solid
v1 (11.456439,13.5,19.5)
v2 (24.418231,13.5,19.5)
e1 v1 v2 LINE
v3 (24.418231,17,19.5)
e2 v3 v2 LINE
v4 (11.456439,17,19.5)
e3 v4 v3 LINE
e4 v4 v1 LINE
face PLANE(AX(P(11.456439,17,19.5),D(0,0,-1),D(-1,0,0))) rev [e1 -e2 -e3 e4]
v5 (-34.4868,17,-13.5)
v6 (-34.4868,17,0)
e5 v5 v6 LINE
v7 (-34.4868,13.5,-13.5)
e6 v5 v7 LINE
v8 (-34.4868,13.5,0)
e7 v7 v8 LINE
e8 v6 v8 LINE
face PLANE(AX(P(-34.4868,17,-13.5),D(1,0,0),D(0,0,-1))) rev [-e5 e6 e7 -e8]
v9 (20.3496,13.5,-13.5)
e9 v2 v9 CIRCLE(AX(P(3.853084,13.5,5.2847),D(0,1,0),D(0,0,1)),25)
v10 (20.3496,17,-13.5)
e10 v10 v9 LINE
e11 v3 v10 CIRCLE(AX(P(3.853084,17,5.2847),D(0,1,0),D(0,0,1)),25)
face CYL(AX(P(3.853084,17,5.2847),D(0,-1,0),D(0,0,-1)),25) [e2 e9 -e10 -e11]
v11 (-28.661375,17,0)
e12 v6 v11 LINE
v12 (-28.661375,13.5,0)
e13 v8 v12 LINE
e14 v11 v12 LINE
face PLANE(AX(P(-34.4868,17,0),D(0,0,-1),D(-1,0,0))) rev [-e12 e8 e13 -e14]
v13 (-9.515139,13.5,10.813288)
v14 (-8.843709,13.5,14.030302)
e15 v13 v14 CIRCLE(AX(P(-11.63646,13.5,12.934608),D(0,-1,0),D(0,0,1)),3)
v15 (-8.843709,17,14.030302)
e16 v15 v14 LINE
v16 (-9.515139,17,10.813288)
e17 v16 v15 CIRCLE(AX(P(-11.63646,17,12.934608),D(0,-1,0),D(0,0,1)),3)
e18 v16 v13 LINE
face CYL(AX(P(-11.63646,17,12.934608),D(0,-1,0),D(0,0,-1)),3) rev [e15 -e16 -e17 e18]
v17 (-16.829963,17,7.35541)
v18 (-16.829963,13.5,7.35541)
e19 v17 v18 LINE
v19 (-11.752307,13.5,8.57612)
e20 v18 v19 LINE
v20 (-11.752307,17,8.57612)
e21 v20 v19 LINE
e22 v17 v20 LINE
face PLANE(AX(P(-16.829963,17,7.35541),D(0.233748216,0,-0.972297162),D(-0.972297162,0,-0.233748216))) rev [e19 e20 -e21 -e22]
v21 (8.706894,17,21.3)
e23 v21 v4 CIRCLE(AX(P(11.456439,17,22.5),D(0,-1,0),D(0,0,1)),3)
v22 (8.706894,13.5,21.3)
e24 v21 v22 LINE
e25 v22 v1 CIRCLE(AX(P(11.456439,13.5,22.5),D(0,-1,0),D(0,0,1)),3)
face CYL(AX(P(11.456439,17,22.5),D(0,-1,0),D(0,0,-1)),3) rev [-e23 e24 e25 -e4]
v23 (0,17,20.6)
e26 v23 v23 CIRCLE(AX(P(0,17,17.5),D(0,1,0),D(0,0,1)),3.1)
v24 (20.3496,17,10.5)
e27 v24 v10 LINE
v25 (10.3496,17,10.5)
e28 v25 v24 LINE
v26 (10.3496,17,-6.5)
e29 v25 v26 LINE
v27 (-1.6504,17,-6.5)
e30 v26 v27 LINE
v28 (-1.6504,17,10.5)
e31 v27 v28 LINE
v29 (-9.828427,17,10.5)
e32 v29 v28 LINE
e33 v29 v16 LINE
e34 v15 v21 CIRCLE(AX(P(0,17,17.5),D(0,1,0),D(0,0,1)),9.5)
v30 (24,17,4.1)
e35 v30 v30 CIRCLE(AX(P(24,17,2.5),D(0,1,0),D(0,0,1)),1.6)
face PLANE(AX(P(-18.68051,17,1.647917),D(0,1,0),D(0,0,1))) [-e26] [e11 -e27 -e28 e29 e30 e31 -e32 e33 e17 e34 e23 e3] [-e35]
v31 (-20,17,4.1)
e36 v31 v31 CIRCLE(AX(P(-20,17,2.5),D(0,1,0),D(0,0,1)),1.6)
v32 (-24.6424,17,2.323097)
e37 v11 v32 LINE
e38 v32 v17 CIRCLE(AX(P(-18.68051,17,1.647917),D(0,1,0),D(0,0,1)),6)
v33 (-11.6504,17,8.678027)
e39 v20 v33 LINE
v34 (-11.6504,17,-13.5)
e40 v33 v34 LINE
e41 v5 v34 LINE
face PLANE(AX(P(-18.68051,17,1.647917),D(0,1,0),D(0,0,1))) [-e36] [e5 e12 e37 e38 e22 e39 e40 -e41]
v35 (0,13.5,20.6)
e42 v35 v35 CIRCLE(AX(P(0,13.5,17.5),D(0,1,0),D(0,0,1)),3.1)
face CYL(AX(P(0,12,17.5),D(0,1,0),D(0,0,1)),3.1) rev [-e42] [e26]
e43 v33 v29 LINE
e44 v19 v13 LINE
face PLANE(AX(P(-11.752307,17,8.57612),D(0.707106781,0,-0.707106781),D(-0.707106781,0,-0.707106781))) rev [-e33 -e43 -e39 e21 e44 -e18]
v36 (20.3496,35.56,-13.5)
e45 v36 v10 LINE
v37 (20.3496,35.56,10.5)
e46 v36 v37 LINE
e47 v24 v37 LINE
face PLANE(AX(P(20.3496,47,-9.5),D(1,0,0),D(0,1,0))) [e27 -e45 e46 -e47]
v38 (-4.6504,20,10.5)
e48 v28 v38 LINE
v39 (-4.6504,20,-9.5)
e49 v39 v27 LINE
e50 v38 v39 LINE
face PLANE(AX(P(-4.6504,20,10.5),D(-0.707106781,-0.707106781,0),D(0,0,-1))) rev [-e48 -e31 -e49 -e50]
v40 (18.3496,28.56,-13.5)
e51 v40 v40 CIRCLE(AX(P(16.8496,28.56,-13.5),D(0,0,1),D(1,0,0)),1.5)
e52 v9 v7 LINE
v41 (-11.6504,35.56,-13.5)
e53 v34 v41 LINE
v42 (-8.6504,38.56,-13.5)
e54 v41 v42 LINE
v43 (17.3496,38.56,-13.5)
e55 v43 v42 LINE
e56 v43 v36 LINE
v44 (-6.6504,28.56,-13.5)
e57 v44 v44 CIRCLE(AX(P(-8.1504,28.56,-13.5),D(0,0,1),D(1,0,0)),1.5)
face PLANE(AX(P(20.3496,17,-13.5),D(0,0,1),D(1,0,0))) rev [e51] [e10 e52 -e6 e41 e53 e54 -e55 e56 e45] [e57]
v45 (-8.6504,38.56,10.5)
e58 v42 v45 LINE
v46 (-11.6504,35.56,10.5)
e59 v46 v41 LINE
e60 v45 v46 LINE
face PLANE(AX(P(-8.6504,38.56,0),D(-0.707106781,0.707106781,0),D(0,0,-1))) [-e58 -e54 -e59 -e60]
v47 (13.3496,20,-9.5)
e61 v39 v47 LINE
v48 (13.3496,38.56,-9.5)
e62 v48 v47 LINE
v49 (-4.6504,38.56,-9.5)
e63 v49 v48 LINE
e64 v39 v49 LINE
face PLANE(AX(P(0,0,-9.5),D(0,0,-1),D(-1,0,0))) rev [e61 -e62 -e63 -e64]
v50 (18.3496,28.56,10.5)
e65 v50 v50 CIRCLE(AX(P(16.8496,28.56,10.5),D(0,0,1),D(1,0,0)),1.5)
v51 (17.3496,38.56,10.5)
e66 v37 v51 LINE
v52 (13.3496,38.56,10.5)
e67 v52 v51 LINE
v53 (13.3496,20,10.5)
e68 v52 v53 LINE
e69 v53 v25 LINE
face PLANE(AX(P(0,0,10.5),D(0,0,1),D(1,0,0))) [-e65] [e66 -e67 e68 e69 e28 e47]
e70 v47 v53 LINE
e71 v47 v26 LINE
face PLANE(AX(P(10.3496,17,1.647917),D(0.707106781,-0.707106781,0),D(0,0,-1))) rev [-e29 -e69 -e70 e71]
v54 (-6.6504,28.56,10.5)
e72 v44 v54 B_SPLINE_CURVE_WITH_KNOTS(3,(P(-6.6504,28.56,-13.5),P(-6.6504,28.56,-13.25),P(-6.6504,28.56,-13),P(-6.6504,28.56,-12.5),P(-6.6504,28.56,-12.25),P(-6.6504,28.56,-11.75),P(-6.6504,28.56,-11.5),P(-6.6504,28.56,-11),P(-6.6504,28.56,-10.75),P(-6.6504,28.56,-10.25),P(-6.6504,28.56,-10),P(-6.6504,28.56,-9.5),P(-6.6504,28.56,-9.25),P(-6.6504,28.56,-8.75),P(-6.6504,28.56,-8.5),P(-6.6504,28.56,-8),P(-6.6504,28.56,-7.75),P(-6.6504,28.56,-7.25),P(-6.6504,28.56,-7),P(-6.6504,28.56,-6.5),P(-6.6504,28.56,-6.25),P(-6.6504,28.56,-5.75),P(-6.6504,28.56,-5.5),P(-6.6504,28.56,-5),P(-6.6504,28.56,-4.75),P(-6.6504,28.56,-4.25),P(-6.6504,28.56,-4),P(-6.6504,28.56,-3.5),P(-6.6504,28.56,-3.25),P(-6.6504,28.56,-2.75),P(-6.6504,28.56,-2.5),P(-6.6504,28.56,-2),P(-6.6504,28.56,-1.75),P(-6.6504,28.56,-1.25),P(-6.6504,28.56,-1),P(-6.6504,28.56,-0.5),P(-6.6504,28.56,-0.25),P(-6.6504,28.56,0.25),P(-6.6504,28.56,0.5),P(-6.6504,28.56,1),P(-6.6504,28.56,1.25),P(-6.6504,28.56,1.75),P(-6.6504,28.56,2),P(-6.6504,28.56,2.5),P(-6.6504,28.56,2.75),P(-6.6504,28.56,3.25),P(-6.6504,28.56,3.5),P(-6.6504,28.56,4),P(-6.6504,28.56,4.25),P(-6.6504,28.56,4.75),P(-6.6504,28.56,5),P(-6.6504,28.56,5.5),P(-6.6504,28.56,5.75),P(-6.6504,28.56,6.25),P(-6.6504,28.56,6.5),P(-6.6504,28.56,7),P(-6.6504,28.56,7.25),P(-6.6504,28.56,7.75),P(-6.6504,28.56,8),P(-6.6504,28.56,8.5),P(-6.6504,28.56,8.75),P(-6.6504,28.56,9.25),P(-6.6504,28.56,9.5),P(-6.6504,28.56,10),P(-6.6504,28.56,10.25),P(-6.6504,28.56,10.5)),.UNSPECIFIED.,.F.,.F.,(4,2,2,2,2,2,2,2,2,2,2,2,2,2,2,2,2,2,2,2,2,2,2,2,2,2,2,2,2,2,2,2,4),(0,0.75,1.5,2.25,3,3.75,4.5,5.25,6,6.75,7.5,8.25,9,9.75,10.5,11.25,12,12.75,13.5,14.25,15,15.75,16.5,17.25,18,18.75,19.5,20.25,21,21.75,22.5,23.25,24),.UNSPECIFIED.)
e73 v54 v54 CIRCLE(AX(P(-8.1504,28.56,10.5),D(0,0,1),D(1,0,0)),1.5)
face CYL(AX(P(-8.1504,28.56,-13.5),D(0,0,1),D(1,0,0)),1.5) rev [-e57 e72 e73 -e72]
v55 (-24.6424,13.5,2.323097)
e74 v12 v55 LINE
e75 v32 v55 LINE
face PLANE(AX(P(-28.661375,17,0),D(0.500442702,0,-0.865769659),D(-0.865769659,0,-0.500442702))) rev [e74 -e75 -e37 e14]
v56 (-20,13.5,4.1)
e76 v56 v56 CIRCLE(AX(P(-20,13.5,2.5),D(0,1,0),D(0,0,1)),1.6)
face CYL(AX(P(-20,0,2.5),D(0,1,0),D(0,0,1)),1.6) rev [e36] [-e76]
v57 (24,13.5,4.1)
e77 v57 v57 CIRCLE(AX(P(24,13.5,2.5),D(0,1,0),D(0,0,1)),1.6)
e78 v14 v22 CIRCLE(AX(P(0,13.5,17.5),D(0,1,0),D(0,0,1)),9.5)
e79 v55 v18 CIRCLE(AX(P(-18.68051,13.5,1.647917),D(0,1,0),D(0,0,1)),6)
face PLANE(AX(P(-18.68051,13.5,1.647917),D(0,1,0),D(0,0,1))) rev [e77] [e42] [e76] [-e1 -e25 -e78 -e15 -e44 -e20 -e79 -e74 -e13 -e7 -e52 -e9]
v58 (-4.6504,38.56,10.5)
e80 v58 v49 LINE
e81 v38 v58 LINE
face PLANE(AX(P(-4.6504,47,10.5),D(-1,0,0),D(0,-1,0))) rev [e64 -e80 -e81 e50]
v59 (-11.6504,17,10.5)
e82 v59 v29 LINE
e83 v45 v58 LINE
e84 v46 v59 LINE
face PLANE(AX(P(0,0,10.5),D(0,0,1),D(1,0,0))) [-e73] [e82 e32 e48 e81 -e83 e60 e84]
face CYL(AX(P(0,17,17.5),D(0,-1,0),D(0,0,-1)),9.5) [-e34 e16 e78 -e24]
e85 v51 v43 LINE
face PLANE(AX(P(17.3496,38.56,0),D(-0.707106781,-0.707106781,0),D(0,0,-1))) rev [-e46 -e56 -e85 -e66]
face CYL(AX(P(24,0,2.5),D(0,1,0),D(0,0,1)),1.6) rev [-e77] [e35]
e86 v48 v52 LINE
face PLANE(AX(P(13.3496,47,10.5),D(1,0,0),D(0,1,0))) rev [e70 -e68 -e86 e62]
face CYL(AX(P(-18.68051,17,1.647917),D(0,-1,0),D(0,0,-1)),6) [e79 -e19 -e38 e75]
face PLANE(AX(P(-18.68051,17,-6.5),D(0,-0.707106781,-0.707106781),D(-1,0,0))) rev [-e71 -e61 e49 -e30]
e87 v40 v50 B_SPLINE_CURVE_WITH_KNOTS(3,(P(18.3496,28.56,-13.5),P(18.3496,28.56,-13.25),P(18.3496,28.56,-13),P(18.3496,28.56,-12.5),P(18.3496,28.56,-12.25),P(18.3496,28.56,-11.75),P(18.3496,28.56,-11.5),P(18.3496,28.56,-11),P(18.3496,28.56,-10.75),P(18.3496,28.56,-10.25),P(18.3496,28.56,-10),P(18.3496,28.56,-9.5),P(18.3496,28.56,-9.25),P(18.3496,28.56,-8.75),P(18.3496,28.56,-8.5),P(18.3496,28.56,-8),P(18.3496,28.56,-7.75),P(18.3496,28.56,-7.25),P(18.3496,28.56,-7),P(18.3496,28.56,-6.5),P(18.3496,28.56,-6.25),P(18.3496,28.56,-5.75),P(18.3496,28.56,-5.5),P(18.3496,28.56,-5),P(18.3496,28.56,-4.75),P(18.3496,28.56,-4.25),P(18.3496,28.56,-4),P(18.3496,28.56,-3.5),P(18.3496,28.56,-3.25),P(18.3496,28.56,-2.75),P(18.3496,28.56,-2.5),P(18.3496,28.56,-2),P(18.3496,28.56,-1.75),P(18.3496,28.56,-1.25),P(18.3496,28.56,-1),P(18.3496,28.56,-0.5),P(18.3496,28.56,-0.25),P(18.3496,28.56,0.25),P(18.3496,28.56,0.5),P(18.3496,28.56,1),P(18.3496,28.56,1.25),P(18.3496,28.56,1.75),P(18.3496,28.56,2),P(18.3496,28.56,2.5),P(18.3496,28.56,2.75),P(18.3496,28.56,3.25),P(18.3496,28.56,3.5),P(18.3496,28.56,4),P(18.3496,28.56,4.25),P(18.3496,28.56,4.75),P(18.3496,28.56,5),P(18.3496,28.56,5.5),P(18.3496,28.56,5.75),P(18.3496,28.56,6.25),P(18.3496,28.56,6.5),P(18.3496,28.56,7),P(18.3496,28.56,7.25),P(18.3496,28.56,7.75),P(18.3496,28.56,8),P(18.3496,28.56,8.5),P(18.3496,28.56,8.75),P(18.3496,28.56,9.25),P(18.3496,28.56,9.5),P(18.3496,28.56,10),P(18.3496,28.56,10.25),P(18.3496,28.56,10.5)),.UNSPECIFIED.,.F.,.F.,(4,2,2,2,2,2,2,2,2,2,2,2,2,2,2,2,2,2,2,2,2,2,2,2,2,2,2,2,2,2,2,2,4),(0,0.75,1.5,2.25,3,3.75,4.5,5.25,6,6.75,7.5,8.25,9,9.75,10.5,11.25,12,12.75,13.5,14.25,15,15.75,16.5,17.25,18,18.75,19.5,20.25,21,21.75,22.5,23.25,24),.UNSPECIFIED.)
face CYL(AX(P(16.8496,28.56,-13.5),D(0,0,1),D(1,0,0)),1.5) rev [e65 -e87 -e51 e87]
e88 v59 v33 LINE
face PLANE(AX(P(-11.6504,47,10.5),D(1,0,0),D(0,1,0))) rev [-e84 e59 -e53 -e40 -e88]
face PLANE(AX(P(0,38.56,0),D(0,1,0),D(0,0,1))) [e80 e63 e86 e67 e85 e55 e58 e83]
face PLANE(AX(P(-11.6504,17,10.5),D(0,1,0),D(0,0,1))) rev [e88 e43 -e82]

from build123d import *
from build123d.topology import SkipClean

# Parameters (mm, degrees)
CROQUIS1_W              = 70
CROQUIS1_H              = 65
EXTRUIR1_DEPTH          = 3.5
CROQUIS2_R              = 3.1
EXTRUIR2_DEPTH          = 5
EXTRUIR3_DEPTH          = 10
CROQUIS4_OUTSIDE_W      = 91.294
CROQUIS4_OUTSIDE_H      = 86.294
EXTRUIR4_DEPTH          = 10
REDONDEO1_R             = 3
EXTRUIR5_DEPTH          = 13.5
EXTRUIR6_DEPTH          = 3.5
CROQUIS7_R              = 1.6
EXTRUIR7_DEPTH          = 47.982330447
CROQUIS8_R              = 3.1
EXTRUIR8_DEPTH          = 5
CROQUIS9_W              = 0.7
CROQUIS9_H              = 10.5
EXTRUIR9_DEPTH          = 10
EXTRUIR10_DEPTH         = 63.752948337
EXTRUIR10_DEPTH_BACK    = 10
CROQUIS10_W             = 3.0625
CROQUIS10_H             = 5
CROQUIS11_W             = 54.8364
CROQUIS11_H             = 30
SALIENTE_EXTRUIR1_DEPTH = 4
CROQUIS13_W             = 7
CROQUIS13_H             = 30
SALIENTE_EXTRUIR2_DEPTH = 20
CORTAR_EXTRUIR1_DEPTH   = 8.44
CROQUIS15_W             = 22.8364
CROQUIS15_H             = 21.56
CORTAR_EXTRUIR2_DEPTH   = 8.44
CHAFL_N2_SIZE           = 3
CROQUIS16_R             = 1.5
CORTAR_EXTRUIR3_DEPTH   = 58.02817702
CHAFL_N3_SIZE           = 3


with BuildPart() as part:
    # Croquis1 → Extruir1 (new body)
    with BuildSketch(Plane(origin=(0, 0, 0), x_dir=(1, 0, 0), z_dir=(0, 1, 0))):
        Rectangle(CROQUIS1_W, CROQUIS1_H)
    extrude(amount=EXTRUIR1_DEPTH)

    # Croquis2 → Extruir2 (cut)
    with BuildSketch(Plane(origin=(0, 3.5, 0), x_dir=(1, 0, 0), z_dir=(0, 1, 0))):
        with Locations(Location((0, -17.5, 0), (0, 0, 270))):
            Circle(CROQUIS2_R)
    extrude(amount=-EXTRUIR2_DEPTH, mode=Mode.SUBTRACT)

    # Croquis3 → Extruir3 (add)
    with BuildSketch(Plane(origin=(0, 3.5, 0), x_dir=(1, 0, 0), z_dir=(0, 1, 0))):
        with BuildLine():
            Line((-34.4868, 13.5), (20.3496, 13.5))
            Line((20.3496, 13.5), (20.3496, 0))
            Line((20.3496, 0), (17.146428199, 0))
            ThreePointArc((17.146428199, 0), (22.955777517, -8.939493087), (24.418230894, -19.5))
            Line((24.418230894, -19.5), (9.287087811, -19.5))
            ThreePointArc((9.287087811, -19.5), (-3.635492607, -26.276855559), (-7.981176331, -12.347250794))
            Line((-7.981176331, -12.347250794), (-18.680510212, -1.647916913))
            ThreePointArc((-18.680510212, -1.647916913), (-17.932408832, -0.806327142), (-17.146428199, 0))
            Line((-17.146428199, 0), (-34.4868, 0))
            Line((-34.4868, 0), (-34.4868, 13.5))
        make_face()
        with BuildLine():
            Line((-32.9868, 1.5), (-12.961481397, 1.5))
            ThreePointArc((-12.961481397, 1.5), (-14.868021343, 0.048274597), (-16.613165932, -1.593940849))
            Line((-16.613165932, -1.593940849), (-5.999348286, -12.207758495))
            ThreePointArc((-5.999348286, -12.207758495), (-3.061467459, -24.89103626), (7.984359711, -18))
            Line((7.984359711, -18), (22.994564575, -18))
            ThreePointArc((22.994564575, -18), (20.451694563, -6.977253708), (12.961481397, 1.5))
            Line((12.961481397, 1.5), (18.8496, 1.5))
            Line((18.8496, 1.5), (18.8496, 12))
            Line((18.8496, 12), (-32.9868, 12))
            Line((-32.9868, 12), (-32.9868, 1.5))
        make_face(mode=Mode.SUBTRACT)
    extrude(amount=EXTRUIR3_DEPTH)

    # Croquis4 outside → Extruir4 (cut)
    with SkipClean():  # the faces are left unmerged after this step: merging them gives an invalid solid
        with BuildSketch(Plane(origin=(0, 3.5, 0), x_dir=(1, 0, 0), z_dir=(0, 1, 0))):
            Rectangle(CROQUIS4_OUTSIDE_W, CROQUIS4_OUTSIDE_H)
            with BuildLine():
                Line((-34.4868, 0), (-17.146428199, 0))
                ThreePointArc((-17.146428199, 0), (-17.932408832, -0.806327142), (-18.680510212, -1.647916913))
                Line((-18.680510212, -1.647916913), (-7.981176331, -12.347250794))
                ThreePointArc((-7.981176331, -12.347250794), (-3.635492607, -26.276855559), (9.287087811, -19.5))
                Line((9.287087811, -19.5), (24.418230894, -19.5))
                ThreePointArc((24.418230894, -19.5), (22.955777517, -8.939493087), (17.146428199, 0))
                Line((17.146428199, 0), (20.3496, 0))
                Line((20.3496, 0), (20.3496, 13.5))
                Line((20.3496, 13.5), (-34.4868, 13.5))
                Line((-34.4868, 13.5), (-34.4868, 0))
            make_face(mode=Mode.SUBTRACT)
        extrude(amount=-EXTRUIR4_DEPTH, mode=Mode.SUBTRACT)

    # Redondeo1
    redondeo1_edges = [part.edges().sort_by_distance(p)[0] for p in [
        (-7.981176331, 8.5, 12.347250794),
        (9.287087811, 8.5, 19.5),
        (-5.999348286, 8.5, 12.207758495),
        (7.984359711, 8.5, 18),
    ]]
    fillet(redondeo1_edges, radius=REDONDEO1_R)

    # Croquis5 → Extruir5 (add)
    with SkipClean():  # the faces are left unmerged after this step: merging them gives an invalid solid
        with BuildSketch(Plane.XZ):
            with BuildLine():
                Line((-18.680510212, 1.647916913), (-14.437869525, 5.8905576))
                ThreePointArc((-14.437869525, 5.8905576), (-21.723092903, 6.819250451), (-24.449770984, 0))
                Line((-24.449770984, 0), (-17.146428199, 0))
                ThreePointArc((-17.146428199, 0), (-17.932408832, 0.806327142), (-18.680510212, 1.647916913))
            make_face()
            with BuildLine():
                Line((20.3496, 0), (20.3496, -13.5))
                ThreePointArc((20.3496, -13.5), (28.665212431, 2.225567304), (24.418230894, 19.5))
                ThreePointArc((24.418230894, 19.5), (22.955777517, 8.939493087), (17.146428199, 0))
                Line((17.146428199, 0), (20.3496, 0))
            make_face()
        extrude(amount=-EXTRUIR5_DEPTH)

    # Chaflán1
    # the kernel refuses this chamfer: 5, 4.044665138 mm, written as the material it adds along each edge
    with BuildSketch(Plane(origin=(-14.437869525, 3.5, 5.8905576), x_dir=(-0.8768595348589335, 0, 0.48074666522709736), z_dir=(0, 1, 0))) as chafl_n1_piece_1:
        with BuildLine():
            Line((2.949791971, 0), (-1.211824758, 3.780414953))
            Line((-1.211824758, 3.780414953), (-1.307822013, 3.752405544))
            ThreePointArc((-1.307822013, 3.752405544), (-0.651776703, 1.876825504), (-0.095997255, -0.02800941))
            Line((-0.095997255, -0.02800941), (0.02800941, -0.095997255))
            ThreePointArc((0.02800941, -0.095997255), (1.47002525, 0.136406993), (2.931105495, -0.098238565))
            Line((2.931105495, -0.098238565), (2.949791971, 0))
        make_face()
    extrude(amount=10)
    with BuildSketch(Plane(origin=(-24.449770984, 3.5, 0), x_dir=(-0.00803680374358312, 0, 0.9999677043712897), z_dir=(0, 1, 0))) as chafl_n1_piece_2:
        with BuildLine():
            Line((2.423263449, 0), (-0.064845869, -4.38542071))
            Line((-0.064845869, -4.38542071), (-0.164842639, -4.386224391))
            ThreePointArc((-0.164842639, -4.386224391), (-0.082377051, -2.193111839), (-0.09999677, -0.00080368))
            Line((-0.09999677, -0.00080368), (0.026691621, 0.096371974))
            ThreePointArc((0.026691621, 0.096371974), (1.204598314, -0.104316531), (2.411212242, 0.099271186))
            Line((2.411212242, 0.099271186), (2.423263449, 0))
        make_face()
    extrude(amount=10)
    with BuildSketch(Plane(origin=(-24.449770984, 0, 0), x_dir=(-0.9997395779240649, 0, -0.022820524363231547), z_dir=(0, 1, 0))) as chafl_n1_piece_3:
        with BuildLine():
            Line((4.385900112, 0), (-0.035828136, 2.422998574))
            Line((-0.035828136, 2.422998574), (-0.134910293, 2.409480951))
            ThreePointArc((-0.134910293, 2.409480951), (0.08649505, 1.206008973), (-0.096756078, 0.025263837))
            Line((-0.096756078, 0.025263837), (0.002282052, -0.099973958))
            ThreePointArc((0.002282052, -0.099973958), (2.194090072, -0.04994272), (4.388182164, -0.099973958))
            Line((4.388182164, -0.099973958), (4.385900112, 0))
        make_face()
    extrude(amount=3.5)
    with BuildSketch(Plane(origin=(-14.437869525, 0, 5.8905576), x_dir=(0.7254657554746629, 0, 0.6882582637597435), z_dir=(0, 1, 0))) as chafl_n1_piece_4:
        with BuildLine():
            Line((3.96989376, 0), (-0.900434913, -2.809001538))
            Line((-0.900434913, -2.809001538), (-0.98828054, -2.761219262))
            ThreePointArc((-0.98828054, -2.761219262), (-0.318834214, -1.441501248), (-0.099965384, 0.002630967))
            Line((-0.099965384, 0.002630967), (0.002630967, 0.099965384))
            ThreePointArc((0.002630967, 0.099965384), (1.986203869, 0.047760165), (3.972524727, 0.099965384))
            Line((3.972524727, 0.099965384), (3.96989376, 0))
        make_face()
    extrude(amount=3.5)


with BuildPart() as body_2:
    # Croquis6 → Extruir6 (new body)
    with BuildSketch(Plane(origin=(0, 13.5, 0), x_dir=(1, 0, 0), z_dir=(0, 1, 0))):
        with BuildLine():
            Line((-34.4868, 13.5), (-34.4868, 0))
            Line((-34.4868, 0), (-28.661374979, 0))
            Line((-28.661374979, 0), (-24.642400208, -2.323096648))
            ThreePointArc((-24.642400208, -2.323096648), (-21.929637735, -6.692039268), (-16.829963308, -7.355409896))
            Line((-16.829963308, -7.355409896), (-11.752306982, -8.576120143))
            Line((-11.752306982, -8.576120143), (-9.515139435, -10.813287689))
            ThreePointArc((-9.515139435, -10.813287689), (-8.69974084, -12.321679102), (-8.843709432, -14.030302105))
            ThreePointArc((-8.843709432, -14.030302105), (-3.635492607, -26.276855559), (8.70689382, -21.3))
            ThreePointArc((8.70689382, -21.3), (9.813271565, -19.99001992), (11.456439237, -19.5))
            Line((11.456439237, -19.5), (24.418230894, -19.5))
            ThreePointArc((24.418230894, -19.5), (28.665212431, -2.225567304), (20.3496, 13.5))
            Line((20.3496, 13.5), (-34.4868, 13.5))
        make_face()
    extrude(amount=EXTRUIR6_DEPTH)


with BuildPart() as extruir7_tool:
    # Croquis7 → Extruir7 (new, through all)
    with BuildSketch(Plane(origin=(0, 17, 0), x_dir=(1, 0, 0), z_dir=(0, 1, 0))):
        with Locations(Location((-20, -2.5, 0), (0, 0, 270))):
            Circle(CROQUIS7_R)
        with Locations(Location((24, -2.5, 0), (0, 0, 270))):
            Circle(CROQUIS7_R)
    extrude(amount=-EXTRUIR7_DEPTH)


with BuildPart() as part_1:
    add(part.part)

    # Extruir7: cut by extruir7_tool
    add(extruir7_tool.part, mode=Mode.SUBTRACT)

    # Croquis9 → Extruir9 (cut)
    with BuildSketch(Plane(origin=(0, 13.5, 0), x_dir=(1, 0, 0), z_dir=(0, 1, 0))):
        with Locations((19.1996, 6.75)):
            Rectangle(CROQUIS9_W, CROQUIS9_H)
    extrude(amount=-EXTRUIR9_DEPTH, mode=Mode.SUBTRACT)

    # Croquis10 → Extruir10 (cut, two sides: drawn at the far end of the back side and taken through both)
    with BuildSketch(Plane.ZY.offset(-19.5496).offset(-EXTRUIR10_DEPTH_BACK)):
        with Locations((-8.9375, 8.5)):
            Rectangle(CROQUIS10_W, CROQUIS10_H)
    extrude(amount=EXTRUIR10_DEPTH + EXTRUIR10_DEPTH_BACK, mode=Mode.SUBTRACT)


with BuildPart() as body_2_1:
    add(body_2.part)

    # Extruir7: cut by extruir7_tool
    add(extruir7_tool.part, mode=Mode.SUBTRACT)

    # Croquis8 → Extruir8 (cut)
    with BuildSketch(Plane(origin=(0, 17, 0), x_dir=(1, 0, 0), z_dir=(0, 1, 0))):
        with Locations(Location((0, -17.5, 0), (0, 0, 270))):
            Circle(CROQUIS8_R)
    extrude(amount=-EXTRUIR8_DEPTH, mode=Mode.SUBTRACT)

    # Croquis11 → Saliente-Extruir1 (add)
    with BuildSketch(Plane(origin=(0, 0, -13.5), x_dir=(-1, 0, 0), z_dir=(0, 0, -1))):
        with Locations((7.0686, 32)):
            Rectangle(CROQUIS11_W, CROQUIS11_H)
    extrude(amount=-SALIENTE_EXTRUIR1_DEPTH)

    # Croquis13 → Saliente-Extruir2 (add)
    with BuildSketch(Plane.XY.offset(-9.5)):
        with Locations((-8.1504, 32)):
            Rectangle(CROQUIS13_W, CROQUIS13_H)
        with Locations((16.8496, 32)):
            Rectangle(CROQUIS13_W, CROQUIS13_H)
    extrude(amount=SALIENTE_EXTRUIR2_DEPTH)

    # Croquis14 → Cortar-Extruir1 (cut)
    with BuildSketch(Plane(origin=(0, 47, 0), x_dir=(1, 0, 0), z_dir=(0, 1, 0))):
        Polygon((20.3496, 13.5), (-34.4868, 13.5), (-34.4868, 9.5), (-11.6504, 9.5), (-11.6504, -10.5), (-4.6504, -10.5), (-4.6504, 9.5), (13.3496, 9.5), (13.3496, -10.5), (20.3496, -10.5), align=None)
    extrude(amount=-CORTAR_EXTRUIR1_DEPTH, mode=Mode.SUBTRACT)

    # Croquis15 → Cortar-Extruir2 (cut)
    with BuildSketch(Plane.XY.offset(-9.5)):
        with Locations((-23.0686, 27.78)):
            Rectangle(CROQUIS15_W, CROQUIS15_H)
    extrude(amount=-CORTAR_EXTRUIR2_DEPTH, mode=Mode.SUBTRACT)

    # Chaflán2
    chafl_n2_edges = [body_2_1.edges().sort_by_distance(p)[0] for p in [
        (-4.6504, 17, 0.5),
        (4.3496, 17, -9.5),
        (13.3496, 17, 0.5),
    ]]
    chamfer(chafl_n2_edges, length=CHAFL_N2_SIZE)

    # Croquis16 → Cortar-Extruir3 (cut, through all)
    with BuildSketch(Plane.XY.offset(10.5)):
        with Locations((-8.1504, 28.56)):
            Circle(CROQUIS16_R)
        with Locations((16.8496, 28.56)):
            Circle(CROQUIS16_R)
    extrude(amount=-CORTAR_EXTRUIR3_DEPTH, mode=Mode.SUBTRACT)

    # Chaflán3
    chafl_n3_edges = [body_2_1.edges().sort_by_distance(p)[0] for p in [
        (20.3496, 38.56, -1.5),
        (-11.6504, 38.56, -1.5),
    ]]
    chamfer(chafl_n3_edges, length=CHAFL_N3_SIZE)


solid = body_2_1.part
